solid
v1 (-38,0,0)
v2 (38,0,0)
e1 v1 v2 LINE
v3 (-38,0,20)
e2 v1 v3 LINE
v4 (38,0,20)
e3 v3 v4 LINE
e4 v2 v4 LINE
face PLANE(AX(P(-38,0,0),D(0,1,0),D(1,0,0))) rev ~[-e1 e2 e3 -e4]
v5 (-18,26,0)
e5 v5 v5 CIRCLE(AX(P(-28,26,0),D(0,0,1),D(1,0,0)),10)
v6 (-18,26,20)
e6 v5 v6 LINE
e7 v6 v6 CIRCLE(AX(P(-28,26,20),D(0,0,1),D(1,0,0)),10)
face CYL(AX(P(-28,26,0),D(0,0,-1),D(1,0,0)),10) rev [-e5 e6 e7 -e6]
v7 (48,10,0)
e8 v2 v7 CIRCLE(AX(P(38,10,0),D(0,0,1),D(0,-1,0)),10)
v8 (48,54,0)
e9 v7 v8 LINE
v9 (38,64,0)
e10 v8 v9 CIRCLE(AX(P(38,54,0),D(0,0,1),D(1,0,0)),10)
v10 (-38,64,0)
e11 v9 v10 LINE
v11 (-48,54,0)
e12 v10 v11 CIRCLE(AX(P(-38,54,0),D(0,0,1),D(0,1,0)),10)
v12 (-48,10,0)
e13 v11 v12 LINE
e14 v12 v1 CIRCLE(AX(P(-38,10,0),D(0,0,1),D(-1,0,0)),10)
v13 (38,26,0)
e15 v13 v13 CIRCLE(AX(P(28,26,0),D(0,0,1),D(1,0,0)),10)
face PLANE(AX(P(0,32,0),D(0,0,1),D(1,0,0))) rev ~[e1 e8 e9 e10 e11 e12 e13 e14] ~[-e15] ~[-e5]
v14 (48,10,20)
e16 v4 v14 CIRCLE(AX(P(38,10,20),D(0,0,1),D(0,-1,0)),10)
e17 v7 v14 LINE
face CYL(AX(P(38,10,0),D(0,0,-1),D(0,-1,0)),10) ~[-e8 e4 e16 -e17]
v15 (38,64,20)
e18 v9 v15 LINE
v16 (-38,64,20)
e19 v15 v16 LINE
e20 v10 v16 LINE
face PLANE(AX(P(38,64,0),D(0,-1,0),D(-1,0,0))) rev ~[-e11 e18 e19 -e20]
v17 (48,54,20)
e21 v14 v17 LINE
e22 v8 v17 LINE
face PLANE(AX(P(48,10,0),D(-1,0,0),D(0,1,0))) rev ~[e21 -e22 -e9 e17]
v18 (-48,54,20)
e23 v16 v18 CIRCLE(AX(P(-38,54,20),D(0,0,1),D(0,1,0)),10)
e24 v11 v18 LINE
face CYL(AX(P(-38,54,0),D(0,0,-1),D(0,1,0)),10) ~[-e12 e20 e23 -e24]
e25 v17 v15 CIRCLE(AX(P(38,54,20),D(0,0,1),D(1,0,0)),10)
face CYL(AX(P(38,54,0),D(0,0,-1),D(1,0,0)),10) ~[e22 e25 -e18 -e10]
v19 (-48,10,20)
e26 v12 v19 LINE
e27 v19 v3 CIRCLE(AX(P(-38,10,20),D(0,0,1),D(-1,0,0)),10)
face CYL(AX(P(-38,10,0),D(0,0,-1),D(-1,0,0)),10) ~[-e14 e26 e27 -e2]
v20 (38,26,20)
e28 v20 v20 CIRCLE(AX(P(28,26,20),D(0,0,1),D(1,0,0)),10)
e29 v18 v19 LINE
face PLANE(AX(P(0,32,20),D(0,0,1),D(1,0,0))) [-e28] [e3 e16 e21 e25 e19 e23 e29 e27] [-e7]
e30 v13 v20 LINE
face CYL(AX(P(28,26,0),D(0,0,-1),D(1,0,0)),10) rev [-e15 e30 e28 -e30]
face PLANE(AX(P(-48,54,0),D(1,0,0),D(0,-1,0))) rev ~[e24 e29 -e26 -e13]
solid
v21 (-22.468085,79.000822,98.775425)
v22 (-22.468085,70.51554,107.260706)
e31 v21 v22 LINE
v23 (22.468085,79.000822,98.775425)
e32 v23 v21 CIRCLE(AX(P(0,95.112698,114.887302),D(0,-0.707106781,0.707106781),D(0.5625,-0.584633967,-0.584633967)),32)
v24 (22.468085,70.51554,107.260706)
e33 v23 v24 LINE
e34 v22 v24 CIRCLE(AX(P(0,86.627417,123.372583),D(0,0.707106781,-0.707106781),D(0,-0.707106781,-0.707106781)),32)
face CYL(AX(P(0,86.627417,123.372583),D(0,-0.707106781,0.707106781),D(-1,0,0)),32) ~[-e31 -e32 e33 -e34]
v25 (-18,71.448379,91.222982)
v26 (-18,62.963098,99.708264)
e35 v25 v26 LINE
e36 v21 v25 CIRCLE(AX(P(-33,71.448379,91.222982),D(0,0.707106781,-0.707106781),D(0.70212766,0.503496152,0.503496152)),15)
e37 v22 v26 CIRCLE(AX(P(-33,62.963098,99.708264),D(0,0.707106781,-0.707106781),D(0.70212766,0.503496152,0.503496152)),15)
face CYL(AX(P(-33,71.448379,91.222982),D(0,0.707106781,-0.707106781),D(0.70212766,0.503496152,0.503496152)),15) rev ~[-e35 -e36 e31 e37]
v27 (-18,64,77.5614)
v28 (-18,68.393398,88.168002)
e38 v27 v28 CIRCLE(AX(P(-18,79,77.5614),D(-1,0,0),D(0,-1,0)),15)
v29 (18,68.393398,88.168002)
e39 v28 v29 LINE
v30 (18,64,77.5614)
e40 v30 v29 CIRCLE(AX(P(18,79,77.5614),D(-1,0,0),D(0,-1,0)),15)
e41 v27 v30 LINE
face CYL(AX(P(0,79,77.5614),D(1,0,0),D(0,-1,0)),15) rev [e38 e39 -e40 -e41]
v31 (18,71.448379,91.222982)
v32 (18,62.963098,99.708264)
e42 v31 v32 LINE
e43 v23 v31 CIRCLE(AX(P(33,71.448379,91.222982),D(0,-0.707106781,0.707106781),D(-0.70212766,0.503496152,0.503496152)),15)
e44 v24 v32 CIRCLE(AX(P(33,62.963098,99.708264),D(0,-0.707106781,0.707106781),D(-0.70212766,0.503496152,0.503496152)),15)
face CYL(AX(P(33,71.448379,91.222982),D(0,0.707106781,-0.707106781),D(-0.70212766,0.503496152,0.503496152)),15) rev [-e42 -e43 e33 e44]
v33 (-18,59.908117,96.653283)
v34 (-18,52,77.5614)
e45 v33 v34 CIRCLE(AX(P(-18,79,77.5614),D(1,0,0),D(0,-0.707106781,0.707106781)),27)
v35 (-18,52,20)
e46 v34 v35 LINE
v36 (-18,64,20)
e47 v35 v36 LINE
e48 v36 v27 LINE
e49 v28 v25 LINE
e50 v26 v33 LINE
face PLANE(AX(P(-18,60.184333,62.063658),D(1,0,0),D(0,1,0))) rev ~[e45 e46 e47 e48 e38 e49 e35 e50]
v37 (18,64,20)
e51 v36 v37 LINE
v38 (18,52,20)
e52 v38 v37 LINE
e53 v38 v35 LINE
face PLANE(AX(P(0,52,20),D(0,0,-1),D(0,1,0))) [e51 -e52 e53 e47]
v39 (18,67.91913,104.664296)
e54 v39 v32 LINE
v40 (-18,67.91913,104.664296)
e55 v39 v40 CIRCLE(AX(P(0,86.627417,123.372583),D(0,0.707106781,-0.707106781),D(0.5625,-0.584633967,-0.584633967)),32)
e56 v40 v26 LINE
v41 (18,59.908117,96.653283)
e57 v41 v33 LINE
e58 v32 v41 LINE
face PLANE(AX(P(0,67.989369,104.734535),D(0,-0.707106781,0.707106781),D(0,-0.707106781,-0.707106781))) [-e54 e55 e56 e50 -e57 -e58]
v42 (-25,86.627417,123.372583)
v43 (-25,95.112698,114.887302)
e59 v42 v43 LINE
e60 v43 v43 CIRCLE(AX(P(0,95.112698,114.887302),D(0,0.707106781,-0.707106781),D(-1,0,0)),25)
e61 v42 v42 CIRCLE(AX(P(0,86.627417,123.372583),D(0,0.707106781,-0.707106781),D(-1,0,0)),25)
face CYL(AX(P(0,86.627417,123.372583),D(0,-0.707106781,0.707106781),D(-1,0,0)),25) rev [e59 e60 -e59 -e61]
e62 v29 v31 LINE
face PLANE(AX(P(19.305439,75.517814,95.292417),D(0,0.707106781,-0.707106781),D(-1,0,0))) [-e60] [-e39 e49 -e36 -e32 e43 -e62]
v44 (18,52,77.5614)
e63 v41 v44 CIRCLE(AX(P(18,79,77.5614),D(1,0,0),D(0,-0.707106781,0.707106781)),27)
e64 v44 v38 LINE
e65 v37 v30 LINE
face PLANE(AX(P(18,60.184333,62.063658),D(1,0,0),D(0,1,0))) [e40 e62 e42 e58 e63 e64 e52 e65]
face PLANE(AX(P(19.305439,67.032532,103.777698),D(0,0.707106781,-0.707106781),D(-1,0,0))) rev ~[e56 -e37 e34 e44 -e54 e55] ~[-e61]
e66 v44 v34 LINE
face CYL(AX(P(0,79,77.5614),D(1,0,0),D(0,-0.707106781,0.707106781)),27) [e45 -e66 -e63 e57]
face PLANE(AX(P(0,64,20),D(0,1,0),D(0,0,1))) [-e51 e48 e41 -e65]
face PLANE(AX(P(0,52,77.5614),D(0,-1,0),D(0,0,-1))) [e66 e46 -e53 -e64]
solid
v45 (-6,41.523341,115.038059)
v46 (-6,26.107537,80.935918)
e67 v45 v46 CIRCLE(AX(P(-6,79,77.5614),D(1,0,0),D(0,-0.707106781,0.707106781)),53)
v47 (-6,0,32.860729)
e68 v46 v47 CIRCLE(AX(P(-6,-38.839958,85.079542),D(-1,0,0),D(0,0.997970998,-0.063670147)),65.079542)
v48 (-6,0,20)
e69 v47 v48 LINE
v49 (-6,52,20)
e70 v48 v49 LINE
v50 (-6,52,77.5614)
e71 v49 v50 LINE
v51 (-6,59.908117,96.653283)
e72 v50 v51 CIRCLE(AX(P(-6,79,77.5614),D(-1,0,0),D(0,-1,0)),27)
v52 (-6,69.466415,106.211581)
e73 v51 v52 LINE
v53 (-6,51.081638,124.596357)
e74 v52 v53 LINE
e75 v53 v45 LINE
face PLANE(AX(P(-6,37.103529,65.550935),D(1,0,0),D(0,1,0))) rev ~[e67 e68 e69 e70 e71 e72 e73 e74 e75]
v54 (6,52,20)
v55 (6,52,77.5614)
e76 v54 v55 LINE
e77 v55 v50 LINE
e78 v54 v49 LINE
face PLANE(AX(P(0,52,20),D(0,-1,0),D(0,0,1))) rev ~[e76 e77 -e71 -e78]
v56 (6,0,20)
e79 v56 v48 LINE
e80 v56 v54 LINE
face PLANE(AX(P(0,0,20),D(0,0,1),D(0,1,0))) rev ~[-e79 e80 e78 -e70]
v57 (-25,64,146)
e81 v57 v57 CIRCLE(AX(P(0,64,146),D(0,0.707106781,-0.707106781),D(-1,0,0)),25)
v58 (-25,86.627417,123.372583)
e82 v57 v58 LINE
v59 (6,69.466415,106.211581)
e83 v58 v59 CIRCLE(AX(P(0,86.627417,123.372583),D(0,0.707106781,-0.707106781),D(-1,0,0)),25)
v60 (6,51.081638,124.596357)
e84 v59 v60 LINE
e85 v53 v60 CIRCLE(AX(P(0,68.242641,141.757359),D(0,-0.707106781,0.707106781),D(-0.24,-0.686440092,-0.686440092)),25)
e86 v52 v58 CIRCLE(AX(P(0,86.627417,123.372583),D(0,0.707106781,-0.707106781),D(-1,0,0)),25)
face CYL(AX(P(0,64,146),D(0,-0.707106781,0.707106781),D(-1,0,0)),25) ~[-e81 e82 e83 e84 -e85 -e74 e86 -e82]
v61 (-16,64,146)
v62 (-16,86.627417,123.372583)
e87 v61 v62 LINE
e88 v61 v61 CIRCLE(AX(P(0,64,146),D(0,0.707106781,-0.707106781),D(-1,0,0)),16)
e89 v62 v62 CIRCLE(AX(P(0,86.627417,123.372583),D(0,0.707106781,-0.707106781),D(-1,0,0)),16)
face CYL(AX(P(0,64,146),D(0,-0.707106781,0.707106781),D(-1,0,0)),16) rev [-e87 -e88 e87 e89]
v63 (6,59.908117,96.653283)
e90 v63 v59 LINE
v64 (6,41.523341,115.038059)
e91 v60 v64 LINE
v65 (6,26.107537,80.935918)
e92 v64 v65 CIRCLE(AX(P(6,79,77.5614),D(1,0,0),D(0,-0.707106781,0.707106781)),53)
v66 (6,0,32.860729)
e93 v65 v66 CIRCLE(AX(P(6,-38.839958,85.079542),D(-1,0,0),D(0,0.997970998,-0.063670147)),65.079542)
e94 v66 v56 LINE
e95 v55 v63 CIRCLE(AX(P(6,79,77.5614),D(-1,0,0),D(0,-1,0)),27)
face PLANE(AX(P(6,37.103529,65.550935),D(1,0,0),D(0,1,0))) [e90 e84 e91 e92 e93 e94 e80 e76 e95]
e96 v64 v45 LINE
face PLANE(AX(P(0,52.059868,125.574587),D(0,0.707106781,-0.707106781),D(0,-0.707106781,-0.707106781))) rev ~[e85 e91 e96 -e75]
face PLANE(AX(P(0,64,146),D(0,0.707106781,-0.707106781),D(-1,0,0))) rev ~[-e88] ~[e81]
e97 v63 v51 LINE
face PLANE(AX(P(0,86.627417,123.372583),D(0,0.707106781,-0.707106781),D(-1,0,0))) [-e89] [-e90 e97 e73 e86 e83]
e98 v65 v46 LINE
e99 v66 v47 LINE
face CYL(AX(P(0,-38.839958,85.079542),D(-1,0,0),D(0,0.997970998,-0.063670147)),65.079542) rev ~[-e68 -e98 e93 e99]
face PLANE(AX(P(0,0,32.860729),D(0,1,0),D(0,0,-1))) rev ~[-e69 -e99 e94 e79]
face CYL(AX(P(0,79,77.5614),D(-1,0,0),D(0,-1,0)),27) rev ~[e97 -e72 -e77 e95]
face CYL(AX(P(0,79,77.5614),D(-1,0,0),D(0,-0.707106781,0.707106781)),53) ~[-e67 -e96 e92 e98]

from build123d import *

# Parameters (mm, degrees)
F0_R           = 10
F1_DEPTH       = 20
F4_R           = 25
F4_R_2         = 16
F5_DEPTH       = 32
F6_R           = 32
F6_R_2         = 25
F7_DEPTH       = 12
F9_DEPTH       = 18
F9_DEPTH_BACK  = 18
F11_T1_DEPTH   = 12
F13_DEPTH      = 6
F13_DEPTH_BACK = 6


# Not quite as in the source:
# - a fillet or chamfer that OpenCascade refuses, or shapes differently, is made with other operations: its cross-section is extruded or revolved along the edge and cut away or added
# - the program builds the solid bodies; features that only make, move or delete a surface that nothing else refers to are left out


with BuildPart() as f1:
    # F0 (on Top) → F1 (new body)
    with BuildSketch(Plane.XY):
        with BuildLine():
            ThreePointArc((-48, 10), (-45.0710678119, 2.9289321881), (-38, 0))
            Line((-38, 0), (38, 0))
            ThreePointArc((38, 0), (45.0710678119, 2.9289321881), (48, 10))
            Line((48, 10), (48, 54))
            ThreePointArc((48, 54), (45.0710678119, 61.0710678119), (38, 64))
            Line((38, 64), (-38, 64))
            ThreePointArc((-38, 64), (-45.0710678119, 61.0710678119), (-48, 54))
            Line((-48, 54), (-48, 10))
        make_face()
        with Locations((-28, 26)):
            Circle(F0_R, mode=Mode.SUBTRACT)
        with Locations((28, 26)):
            Circle(F0_R, mode=Mode.SUBTRACT)
    extrude(amount=F1_DEPTH)


with BuildPart() as f5:
    # F4 (on face) → F5 (new body)
    with BuildSketch(Plane(origin=(0, -41, 41), x_dir=(-1, 0, 0), z_dir=(0, 0.7071067812, -0.7071067812))):
        with Locations((0, 148.4924240492)):
            Circle(F4_R)
        with Locations((0, 148.4924240492)):
            Circle(F4_R_2, mode=Mode.SUBTRACT)
    extrude(amount=F5_DEPTH)

    # F12 (on Right) → F13 (join, two sides)
    with BuildSketch(Plane.YZ) as f13_sk:
        with BuildLine():
            Line((52.0598683189, 125.5745869447), (41.5233405971, 115.0380592229))
            ThreePointArc((41.5233405971, 115.0380592229), (30.7052427168, 99.392946237), (26.1075371191, 80.9359176211))
            ThreePointArc((26.1075371191, 80.9359176211), (18.3506426226, 54.0218220938), (0, 32.8607288891))
            Line((0, 32.8607288891), (0, 20))
            Line((0, 20), (10, 20))
            Line((10, 20), (52, 20))
            Line((52, 20), (52, 77.56139982))
            ThreePointArc((52, 77.56139982), (54.0552526222, 87.8938524938), (59.908116908, 96.653282912))
            Line((59.908116908, 96.653282912), (62.9630978656, 99.7082638696))
            Line((62.9630978656, 99.7082638696), (70.5155401419, 107.2607061459))
            Line((70.5155401419, 107.2607061459), (52.0598683189, 125.5745869447))
        make_face()
    extrude(amount=F13_DEPTH)
    extrude(f13_sk.sketch, amount=-F13_DEPTH_BACK)


with BuildPart() as f7:
    # F6 (on face) → F7 (new body)
    with BuildSketch(Plane(origin=(0, -18.372583002, 18.372583002), x_dir=(-1, 0, 0), z_dir=(0, 0.7071067812, -0.7071067812))):
        with Locations((0, 148.4924240492)):
            Circle(F6_R)
        with Locations((0, 148.4924240492)):
            Circle(F6_R_2, mode=Mode.SUBTRACT)
    extrude(amount=F7_DEPTH)

    # F8 (on Right) → F9 (join, two sides)
    with BuildSketch(Plane.YZ) as f9_sk:
        with BuildLine():
            Line((52, 20), (64, 20))
            Line((64, 20), (64, 77.56139982))
            ThreePointArc((64, 77.56139982), (65.1418070123, 83.3016513055), (68.3933982822, 88.1680015378))
            Line((68.3933982822, 88.1680015378), (76.4746504982, 96.2492537538))
            Line((76.4746504982, 96.2492537538), (67.989369124, 104.7345351281))
            Line((67.989369124, 104.7345351281), (59.908116908, 96.653282912))
            ThreePointArc((59.908116908, 96.653282912), (54.0552526222, 87.8938524938), (52, 77.56139982))
            Line((52, 77.56139982), (52, 20))
        make_face()
    extrude(amount=F9_DEPTH)
    extrude(f9_sk.sketch, amount=-F9_DEPTH_BACK)

    # F10: union 

    # F11: fillet of radius 15 on 2 edges, made by hand

    # F11_s2 → F11_t1 (join)
    with BuildSketch(Plane(origin=(0, -9.8873016278, 9.8873016278), x_dir=(1, 0, 0), z_dir=(0, -0.7071067812, 0.7071067812))):
        with BuildLine():
            ThreePointArc((22.4680851064, 125.706789284), (19.1620318796, 120.8148603752), (18, 115.0260229878))
            Line((18, 115.0260229878), (18, 122.0349109385))
            ThreePointArc((18, 122.0349109385), (20.3171639431, 123.7697047548), (22.4680851064, 125.706789284))
        make_face()
        with BuildLine():
            ThreePointArc((-22.4680851064, 125.706789284), (-19.1620318796, 120.8148603752), (-18, 115.0260229878))
            Line((-18, 115.0260229878), (-18, 122.0349109385))
            ThreePointArc((-18, 122.0349109385), (-20.3171639431, 123.7697047548), (-22.4680851064, 125.706789284))
        make_face()
    extrude(amount=F11_T1_DEPTH)


solid = Compound([f1.part, f5.part, f7.part])
